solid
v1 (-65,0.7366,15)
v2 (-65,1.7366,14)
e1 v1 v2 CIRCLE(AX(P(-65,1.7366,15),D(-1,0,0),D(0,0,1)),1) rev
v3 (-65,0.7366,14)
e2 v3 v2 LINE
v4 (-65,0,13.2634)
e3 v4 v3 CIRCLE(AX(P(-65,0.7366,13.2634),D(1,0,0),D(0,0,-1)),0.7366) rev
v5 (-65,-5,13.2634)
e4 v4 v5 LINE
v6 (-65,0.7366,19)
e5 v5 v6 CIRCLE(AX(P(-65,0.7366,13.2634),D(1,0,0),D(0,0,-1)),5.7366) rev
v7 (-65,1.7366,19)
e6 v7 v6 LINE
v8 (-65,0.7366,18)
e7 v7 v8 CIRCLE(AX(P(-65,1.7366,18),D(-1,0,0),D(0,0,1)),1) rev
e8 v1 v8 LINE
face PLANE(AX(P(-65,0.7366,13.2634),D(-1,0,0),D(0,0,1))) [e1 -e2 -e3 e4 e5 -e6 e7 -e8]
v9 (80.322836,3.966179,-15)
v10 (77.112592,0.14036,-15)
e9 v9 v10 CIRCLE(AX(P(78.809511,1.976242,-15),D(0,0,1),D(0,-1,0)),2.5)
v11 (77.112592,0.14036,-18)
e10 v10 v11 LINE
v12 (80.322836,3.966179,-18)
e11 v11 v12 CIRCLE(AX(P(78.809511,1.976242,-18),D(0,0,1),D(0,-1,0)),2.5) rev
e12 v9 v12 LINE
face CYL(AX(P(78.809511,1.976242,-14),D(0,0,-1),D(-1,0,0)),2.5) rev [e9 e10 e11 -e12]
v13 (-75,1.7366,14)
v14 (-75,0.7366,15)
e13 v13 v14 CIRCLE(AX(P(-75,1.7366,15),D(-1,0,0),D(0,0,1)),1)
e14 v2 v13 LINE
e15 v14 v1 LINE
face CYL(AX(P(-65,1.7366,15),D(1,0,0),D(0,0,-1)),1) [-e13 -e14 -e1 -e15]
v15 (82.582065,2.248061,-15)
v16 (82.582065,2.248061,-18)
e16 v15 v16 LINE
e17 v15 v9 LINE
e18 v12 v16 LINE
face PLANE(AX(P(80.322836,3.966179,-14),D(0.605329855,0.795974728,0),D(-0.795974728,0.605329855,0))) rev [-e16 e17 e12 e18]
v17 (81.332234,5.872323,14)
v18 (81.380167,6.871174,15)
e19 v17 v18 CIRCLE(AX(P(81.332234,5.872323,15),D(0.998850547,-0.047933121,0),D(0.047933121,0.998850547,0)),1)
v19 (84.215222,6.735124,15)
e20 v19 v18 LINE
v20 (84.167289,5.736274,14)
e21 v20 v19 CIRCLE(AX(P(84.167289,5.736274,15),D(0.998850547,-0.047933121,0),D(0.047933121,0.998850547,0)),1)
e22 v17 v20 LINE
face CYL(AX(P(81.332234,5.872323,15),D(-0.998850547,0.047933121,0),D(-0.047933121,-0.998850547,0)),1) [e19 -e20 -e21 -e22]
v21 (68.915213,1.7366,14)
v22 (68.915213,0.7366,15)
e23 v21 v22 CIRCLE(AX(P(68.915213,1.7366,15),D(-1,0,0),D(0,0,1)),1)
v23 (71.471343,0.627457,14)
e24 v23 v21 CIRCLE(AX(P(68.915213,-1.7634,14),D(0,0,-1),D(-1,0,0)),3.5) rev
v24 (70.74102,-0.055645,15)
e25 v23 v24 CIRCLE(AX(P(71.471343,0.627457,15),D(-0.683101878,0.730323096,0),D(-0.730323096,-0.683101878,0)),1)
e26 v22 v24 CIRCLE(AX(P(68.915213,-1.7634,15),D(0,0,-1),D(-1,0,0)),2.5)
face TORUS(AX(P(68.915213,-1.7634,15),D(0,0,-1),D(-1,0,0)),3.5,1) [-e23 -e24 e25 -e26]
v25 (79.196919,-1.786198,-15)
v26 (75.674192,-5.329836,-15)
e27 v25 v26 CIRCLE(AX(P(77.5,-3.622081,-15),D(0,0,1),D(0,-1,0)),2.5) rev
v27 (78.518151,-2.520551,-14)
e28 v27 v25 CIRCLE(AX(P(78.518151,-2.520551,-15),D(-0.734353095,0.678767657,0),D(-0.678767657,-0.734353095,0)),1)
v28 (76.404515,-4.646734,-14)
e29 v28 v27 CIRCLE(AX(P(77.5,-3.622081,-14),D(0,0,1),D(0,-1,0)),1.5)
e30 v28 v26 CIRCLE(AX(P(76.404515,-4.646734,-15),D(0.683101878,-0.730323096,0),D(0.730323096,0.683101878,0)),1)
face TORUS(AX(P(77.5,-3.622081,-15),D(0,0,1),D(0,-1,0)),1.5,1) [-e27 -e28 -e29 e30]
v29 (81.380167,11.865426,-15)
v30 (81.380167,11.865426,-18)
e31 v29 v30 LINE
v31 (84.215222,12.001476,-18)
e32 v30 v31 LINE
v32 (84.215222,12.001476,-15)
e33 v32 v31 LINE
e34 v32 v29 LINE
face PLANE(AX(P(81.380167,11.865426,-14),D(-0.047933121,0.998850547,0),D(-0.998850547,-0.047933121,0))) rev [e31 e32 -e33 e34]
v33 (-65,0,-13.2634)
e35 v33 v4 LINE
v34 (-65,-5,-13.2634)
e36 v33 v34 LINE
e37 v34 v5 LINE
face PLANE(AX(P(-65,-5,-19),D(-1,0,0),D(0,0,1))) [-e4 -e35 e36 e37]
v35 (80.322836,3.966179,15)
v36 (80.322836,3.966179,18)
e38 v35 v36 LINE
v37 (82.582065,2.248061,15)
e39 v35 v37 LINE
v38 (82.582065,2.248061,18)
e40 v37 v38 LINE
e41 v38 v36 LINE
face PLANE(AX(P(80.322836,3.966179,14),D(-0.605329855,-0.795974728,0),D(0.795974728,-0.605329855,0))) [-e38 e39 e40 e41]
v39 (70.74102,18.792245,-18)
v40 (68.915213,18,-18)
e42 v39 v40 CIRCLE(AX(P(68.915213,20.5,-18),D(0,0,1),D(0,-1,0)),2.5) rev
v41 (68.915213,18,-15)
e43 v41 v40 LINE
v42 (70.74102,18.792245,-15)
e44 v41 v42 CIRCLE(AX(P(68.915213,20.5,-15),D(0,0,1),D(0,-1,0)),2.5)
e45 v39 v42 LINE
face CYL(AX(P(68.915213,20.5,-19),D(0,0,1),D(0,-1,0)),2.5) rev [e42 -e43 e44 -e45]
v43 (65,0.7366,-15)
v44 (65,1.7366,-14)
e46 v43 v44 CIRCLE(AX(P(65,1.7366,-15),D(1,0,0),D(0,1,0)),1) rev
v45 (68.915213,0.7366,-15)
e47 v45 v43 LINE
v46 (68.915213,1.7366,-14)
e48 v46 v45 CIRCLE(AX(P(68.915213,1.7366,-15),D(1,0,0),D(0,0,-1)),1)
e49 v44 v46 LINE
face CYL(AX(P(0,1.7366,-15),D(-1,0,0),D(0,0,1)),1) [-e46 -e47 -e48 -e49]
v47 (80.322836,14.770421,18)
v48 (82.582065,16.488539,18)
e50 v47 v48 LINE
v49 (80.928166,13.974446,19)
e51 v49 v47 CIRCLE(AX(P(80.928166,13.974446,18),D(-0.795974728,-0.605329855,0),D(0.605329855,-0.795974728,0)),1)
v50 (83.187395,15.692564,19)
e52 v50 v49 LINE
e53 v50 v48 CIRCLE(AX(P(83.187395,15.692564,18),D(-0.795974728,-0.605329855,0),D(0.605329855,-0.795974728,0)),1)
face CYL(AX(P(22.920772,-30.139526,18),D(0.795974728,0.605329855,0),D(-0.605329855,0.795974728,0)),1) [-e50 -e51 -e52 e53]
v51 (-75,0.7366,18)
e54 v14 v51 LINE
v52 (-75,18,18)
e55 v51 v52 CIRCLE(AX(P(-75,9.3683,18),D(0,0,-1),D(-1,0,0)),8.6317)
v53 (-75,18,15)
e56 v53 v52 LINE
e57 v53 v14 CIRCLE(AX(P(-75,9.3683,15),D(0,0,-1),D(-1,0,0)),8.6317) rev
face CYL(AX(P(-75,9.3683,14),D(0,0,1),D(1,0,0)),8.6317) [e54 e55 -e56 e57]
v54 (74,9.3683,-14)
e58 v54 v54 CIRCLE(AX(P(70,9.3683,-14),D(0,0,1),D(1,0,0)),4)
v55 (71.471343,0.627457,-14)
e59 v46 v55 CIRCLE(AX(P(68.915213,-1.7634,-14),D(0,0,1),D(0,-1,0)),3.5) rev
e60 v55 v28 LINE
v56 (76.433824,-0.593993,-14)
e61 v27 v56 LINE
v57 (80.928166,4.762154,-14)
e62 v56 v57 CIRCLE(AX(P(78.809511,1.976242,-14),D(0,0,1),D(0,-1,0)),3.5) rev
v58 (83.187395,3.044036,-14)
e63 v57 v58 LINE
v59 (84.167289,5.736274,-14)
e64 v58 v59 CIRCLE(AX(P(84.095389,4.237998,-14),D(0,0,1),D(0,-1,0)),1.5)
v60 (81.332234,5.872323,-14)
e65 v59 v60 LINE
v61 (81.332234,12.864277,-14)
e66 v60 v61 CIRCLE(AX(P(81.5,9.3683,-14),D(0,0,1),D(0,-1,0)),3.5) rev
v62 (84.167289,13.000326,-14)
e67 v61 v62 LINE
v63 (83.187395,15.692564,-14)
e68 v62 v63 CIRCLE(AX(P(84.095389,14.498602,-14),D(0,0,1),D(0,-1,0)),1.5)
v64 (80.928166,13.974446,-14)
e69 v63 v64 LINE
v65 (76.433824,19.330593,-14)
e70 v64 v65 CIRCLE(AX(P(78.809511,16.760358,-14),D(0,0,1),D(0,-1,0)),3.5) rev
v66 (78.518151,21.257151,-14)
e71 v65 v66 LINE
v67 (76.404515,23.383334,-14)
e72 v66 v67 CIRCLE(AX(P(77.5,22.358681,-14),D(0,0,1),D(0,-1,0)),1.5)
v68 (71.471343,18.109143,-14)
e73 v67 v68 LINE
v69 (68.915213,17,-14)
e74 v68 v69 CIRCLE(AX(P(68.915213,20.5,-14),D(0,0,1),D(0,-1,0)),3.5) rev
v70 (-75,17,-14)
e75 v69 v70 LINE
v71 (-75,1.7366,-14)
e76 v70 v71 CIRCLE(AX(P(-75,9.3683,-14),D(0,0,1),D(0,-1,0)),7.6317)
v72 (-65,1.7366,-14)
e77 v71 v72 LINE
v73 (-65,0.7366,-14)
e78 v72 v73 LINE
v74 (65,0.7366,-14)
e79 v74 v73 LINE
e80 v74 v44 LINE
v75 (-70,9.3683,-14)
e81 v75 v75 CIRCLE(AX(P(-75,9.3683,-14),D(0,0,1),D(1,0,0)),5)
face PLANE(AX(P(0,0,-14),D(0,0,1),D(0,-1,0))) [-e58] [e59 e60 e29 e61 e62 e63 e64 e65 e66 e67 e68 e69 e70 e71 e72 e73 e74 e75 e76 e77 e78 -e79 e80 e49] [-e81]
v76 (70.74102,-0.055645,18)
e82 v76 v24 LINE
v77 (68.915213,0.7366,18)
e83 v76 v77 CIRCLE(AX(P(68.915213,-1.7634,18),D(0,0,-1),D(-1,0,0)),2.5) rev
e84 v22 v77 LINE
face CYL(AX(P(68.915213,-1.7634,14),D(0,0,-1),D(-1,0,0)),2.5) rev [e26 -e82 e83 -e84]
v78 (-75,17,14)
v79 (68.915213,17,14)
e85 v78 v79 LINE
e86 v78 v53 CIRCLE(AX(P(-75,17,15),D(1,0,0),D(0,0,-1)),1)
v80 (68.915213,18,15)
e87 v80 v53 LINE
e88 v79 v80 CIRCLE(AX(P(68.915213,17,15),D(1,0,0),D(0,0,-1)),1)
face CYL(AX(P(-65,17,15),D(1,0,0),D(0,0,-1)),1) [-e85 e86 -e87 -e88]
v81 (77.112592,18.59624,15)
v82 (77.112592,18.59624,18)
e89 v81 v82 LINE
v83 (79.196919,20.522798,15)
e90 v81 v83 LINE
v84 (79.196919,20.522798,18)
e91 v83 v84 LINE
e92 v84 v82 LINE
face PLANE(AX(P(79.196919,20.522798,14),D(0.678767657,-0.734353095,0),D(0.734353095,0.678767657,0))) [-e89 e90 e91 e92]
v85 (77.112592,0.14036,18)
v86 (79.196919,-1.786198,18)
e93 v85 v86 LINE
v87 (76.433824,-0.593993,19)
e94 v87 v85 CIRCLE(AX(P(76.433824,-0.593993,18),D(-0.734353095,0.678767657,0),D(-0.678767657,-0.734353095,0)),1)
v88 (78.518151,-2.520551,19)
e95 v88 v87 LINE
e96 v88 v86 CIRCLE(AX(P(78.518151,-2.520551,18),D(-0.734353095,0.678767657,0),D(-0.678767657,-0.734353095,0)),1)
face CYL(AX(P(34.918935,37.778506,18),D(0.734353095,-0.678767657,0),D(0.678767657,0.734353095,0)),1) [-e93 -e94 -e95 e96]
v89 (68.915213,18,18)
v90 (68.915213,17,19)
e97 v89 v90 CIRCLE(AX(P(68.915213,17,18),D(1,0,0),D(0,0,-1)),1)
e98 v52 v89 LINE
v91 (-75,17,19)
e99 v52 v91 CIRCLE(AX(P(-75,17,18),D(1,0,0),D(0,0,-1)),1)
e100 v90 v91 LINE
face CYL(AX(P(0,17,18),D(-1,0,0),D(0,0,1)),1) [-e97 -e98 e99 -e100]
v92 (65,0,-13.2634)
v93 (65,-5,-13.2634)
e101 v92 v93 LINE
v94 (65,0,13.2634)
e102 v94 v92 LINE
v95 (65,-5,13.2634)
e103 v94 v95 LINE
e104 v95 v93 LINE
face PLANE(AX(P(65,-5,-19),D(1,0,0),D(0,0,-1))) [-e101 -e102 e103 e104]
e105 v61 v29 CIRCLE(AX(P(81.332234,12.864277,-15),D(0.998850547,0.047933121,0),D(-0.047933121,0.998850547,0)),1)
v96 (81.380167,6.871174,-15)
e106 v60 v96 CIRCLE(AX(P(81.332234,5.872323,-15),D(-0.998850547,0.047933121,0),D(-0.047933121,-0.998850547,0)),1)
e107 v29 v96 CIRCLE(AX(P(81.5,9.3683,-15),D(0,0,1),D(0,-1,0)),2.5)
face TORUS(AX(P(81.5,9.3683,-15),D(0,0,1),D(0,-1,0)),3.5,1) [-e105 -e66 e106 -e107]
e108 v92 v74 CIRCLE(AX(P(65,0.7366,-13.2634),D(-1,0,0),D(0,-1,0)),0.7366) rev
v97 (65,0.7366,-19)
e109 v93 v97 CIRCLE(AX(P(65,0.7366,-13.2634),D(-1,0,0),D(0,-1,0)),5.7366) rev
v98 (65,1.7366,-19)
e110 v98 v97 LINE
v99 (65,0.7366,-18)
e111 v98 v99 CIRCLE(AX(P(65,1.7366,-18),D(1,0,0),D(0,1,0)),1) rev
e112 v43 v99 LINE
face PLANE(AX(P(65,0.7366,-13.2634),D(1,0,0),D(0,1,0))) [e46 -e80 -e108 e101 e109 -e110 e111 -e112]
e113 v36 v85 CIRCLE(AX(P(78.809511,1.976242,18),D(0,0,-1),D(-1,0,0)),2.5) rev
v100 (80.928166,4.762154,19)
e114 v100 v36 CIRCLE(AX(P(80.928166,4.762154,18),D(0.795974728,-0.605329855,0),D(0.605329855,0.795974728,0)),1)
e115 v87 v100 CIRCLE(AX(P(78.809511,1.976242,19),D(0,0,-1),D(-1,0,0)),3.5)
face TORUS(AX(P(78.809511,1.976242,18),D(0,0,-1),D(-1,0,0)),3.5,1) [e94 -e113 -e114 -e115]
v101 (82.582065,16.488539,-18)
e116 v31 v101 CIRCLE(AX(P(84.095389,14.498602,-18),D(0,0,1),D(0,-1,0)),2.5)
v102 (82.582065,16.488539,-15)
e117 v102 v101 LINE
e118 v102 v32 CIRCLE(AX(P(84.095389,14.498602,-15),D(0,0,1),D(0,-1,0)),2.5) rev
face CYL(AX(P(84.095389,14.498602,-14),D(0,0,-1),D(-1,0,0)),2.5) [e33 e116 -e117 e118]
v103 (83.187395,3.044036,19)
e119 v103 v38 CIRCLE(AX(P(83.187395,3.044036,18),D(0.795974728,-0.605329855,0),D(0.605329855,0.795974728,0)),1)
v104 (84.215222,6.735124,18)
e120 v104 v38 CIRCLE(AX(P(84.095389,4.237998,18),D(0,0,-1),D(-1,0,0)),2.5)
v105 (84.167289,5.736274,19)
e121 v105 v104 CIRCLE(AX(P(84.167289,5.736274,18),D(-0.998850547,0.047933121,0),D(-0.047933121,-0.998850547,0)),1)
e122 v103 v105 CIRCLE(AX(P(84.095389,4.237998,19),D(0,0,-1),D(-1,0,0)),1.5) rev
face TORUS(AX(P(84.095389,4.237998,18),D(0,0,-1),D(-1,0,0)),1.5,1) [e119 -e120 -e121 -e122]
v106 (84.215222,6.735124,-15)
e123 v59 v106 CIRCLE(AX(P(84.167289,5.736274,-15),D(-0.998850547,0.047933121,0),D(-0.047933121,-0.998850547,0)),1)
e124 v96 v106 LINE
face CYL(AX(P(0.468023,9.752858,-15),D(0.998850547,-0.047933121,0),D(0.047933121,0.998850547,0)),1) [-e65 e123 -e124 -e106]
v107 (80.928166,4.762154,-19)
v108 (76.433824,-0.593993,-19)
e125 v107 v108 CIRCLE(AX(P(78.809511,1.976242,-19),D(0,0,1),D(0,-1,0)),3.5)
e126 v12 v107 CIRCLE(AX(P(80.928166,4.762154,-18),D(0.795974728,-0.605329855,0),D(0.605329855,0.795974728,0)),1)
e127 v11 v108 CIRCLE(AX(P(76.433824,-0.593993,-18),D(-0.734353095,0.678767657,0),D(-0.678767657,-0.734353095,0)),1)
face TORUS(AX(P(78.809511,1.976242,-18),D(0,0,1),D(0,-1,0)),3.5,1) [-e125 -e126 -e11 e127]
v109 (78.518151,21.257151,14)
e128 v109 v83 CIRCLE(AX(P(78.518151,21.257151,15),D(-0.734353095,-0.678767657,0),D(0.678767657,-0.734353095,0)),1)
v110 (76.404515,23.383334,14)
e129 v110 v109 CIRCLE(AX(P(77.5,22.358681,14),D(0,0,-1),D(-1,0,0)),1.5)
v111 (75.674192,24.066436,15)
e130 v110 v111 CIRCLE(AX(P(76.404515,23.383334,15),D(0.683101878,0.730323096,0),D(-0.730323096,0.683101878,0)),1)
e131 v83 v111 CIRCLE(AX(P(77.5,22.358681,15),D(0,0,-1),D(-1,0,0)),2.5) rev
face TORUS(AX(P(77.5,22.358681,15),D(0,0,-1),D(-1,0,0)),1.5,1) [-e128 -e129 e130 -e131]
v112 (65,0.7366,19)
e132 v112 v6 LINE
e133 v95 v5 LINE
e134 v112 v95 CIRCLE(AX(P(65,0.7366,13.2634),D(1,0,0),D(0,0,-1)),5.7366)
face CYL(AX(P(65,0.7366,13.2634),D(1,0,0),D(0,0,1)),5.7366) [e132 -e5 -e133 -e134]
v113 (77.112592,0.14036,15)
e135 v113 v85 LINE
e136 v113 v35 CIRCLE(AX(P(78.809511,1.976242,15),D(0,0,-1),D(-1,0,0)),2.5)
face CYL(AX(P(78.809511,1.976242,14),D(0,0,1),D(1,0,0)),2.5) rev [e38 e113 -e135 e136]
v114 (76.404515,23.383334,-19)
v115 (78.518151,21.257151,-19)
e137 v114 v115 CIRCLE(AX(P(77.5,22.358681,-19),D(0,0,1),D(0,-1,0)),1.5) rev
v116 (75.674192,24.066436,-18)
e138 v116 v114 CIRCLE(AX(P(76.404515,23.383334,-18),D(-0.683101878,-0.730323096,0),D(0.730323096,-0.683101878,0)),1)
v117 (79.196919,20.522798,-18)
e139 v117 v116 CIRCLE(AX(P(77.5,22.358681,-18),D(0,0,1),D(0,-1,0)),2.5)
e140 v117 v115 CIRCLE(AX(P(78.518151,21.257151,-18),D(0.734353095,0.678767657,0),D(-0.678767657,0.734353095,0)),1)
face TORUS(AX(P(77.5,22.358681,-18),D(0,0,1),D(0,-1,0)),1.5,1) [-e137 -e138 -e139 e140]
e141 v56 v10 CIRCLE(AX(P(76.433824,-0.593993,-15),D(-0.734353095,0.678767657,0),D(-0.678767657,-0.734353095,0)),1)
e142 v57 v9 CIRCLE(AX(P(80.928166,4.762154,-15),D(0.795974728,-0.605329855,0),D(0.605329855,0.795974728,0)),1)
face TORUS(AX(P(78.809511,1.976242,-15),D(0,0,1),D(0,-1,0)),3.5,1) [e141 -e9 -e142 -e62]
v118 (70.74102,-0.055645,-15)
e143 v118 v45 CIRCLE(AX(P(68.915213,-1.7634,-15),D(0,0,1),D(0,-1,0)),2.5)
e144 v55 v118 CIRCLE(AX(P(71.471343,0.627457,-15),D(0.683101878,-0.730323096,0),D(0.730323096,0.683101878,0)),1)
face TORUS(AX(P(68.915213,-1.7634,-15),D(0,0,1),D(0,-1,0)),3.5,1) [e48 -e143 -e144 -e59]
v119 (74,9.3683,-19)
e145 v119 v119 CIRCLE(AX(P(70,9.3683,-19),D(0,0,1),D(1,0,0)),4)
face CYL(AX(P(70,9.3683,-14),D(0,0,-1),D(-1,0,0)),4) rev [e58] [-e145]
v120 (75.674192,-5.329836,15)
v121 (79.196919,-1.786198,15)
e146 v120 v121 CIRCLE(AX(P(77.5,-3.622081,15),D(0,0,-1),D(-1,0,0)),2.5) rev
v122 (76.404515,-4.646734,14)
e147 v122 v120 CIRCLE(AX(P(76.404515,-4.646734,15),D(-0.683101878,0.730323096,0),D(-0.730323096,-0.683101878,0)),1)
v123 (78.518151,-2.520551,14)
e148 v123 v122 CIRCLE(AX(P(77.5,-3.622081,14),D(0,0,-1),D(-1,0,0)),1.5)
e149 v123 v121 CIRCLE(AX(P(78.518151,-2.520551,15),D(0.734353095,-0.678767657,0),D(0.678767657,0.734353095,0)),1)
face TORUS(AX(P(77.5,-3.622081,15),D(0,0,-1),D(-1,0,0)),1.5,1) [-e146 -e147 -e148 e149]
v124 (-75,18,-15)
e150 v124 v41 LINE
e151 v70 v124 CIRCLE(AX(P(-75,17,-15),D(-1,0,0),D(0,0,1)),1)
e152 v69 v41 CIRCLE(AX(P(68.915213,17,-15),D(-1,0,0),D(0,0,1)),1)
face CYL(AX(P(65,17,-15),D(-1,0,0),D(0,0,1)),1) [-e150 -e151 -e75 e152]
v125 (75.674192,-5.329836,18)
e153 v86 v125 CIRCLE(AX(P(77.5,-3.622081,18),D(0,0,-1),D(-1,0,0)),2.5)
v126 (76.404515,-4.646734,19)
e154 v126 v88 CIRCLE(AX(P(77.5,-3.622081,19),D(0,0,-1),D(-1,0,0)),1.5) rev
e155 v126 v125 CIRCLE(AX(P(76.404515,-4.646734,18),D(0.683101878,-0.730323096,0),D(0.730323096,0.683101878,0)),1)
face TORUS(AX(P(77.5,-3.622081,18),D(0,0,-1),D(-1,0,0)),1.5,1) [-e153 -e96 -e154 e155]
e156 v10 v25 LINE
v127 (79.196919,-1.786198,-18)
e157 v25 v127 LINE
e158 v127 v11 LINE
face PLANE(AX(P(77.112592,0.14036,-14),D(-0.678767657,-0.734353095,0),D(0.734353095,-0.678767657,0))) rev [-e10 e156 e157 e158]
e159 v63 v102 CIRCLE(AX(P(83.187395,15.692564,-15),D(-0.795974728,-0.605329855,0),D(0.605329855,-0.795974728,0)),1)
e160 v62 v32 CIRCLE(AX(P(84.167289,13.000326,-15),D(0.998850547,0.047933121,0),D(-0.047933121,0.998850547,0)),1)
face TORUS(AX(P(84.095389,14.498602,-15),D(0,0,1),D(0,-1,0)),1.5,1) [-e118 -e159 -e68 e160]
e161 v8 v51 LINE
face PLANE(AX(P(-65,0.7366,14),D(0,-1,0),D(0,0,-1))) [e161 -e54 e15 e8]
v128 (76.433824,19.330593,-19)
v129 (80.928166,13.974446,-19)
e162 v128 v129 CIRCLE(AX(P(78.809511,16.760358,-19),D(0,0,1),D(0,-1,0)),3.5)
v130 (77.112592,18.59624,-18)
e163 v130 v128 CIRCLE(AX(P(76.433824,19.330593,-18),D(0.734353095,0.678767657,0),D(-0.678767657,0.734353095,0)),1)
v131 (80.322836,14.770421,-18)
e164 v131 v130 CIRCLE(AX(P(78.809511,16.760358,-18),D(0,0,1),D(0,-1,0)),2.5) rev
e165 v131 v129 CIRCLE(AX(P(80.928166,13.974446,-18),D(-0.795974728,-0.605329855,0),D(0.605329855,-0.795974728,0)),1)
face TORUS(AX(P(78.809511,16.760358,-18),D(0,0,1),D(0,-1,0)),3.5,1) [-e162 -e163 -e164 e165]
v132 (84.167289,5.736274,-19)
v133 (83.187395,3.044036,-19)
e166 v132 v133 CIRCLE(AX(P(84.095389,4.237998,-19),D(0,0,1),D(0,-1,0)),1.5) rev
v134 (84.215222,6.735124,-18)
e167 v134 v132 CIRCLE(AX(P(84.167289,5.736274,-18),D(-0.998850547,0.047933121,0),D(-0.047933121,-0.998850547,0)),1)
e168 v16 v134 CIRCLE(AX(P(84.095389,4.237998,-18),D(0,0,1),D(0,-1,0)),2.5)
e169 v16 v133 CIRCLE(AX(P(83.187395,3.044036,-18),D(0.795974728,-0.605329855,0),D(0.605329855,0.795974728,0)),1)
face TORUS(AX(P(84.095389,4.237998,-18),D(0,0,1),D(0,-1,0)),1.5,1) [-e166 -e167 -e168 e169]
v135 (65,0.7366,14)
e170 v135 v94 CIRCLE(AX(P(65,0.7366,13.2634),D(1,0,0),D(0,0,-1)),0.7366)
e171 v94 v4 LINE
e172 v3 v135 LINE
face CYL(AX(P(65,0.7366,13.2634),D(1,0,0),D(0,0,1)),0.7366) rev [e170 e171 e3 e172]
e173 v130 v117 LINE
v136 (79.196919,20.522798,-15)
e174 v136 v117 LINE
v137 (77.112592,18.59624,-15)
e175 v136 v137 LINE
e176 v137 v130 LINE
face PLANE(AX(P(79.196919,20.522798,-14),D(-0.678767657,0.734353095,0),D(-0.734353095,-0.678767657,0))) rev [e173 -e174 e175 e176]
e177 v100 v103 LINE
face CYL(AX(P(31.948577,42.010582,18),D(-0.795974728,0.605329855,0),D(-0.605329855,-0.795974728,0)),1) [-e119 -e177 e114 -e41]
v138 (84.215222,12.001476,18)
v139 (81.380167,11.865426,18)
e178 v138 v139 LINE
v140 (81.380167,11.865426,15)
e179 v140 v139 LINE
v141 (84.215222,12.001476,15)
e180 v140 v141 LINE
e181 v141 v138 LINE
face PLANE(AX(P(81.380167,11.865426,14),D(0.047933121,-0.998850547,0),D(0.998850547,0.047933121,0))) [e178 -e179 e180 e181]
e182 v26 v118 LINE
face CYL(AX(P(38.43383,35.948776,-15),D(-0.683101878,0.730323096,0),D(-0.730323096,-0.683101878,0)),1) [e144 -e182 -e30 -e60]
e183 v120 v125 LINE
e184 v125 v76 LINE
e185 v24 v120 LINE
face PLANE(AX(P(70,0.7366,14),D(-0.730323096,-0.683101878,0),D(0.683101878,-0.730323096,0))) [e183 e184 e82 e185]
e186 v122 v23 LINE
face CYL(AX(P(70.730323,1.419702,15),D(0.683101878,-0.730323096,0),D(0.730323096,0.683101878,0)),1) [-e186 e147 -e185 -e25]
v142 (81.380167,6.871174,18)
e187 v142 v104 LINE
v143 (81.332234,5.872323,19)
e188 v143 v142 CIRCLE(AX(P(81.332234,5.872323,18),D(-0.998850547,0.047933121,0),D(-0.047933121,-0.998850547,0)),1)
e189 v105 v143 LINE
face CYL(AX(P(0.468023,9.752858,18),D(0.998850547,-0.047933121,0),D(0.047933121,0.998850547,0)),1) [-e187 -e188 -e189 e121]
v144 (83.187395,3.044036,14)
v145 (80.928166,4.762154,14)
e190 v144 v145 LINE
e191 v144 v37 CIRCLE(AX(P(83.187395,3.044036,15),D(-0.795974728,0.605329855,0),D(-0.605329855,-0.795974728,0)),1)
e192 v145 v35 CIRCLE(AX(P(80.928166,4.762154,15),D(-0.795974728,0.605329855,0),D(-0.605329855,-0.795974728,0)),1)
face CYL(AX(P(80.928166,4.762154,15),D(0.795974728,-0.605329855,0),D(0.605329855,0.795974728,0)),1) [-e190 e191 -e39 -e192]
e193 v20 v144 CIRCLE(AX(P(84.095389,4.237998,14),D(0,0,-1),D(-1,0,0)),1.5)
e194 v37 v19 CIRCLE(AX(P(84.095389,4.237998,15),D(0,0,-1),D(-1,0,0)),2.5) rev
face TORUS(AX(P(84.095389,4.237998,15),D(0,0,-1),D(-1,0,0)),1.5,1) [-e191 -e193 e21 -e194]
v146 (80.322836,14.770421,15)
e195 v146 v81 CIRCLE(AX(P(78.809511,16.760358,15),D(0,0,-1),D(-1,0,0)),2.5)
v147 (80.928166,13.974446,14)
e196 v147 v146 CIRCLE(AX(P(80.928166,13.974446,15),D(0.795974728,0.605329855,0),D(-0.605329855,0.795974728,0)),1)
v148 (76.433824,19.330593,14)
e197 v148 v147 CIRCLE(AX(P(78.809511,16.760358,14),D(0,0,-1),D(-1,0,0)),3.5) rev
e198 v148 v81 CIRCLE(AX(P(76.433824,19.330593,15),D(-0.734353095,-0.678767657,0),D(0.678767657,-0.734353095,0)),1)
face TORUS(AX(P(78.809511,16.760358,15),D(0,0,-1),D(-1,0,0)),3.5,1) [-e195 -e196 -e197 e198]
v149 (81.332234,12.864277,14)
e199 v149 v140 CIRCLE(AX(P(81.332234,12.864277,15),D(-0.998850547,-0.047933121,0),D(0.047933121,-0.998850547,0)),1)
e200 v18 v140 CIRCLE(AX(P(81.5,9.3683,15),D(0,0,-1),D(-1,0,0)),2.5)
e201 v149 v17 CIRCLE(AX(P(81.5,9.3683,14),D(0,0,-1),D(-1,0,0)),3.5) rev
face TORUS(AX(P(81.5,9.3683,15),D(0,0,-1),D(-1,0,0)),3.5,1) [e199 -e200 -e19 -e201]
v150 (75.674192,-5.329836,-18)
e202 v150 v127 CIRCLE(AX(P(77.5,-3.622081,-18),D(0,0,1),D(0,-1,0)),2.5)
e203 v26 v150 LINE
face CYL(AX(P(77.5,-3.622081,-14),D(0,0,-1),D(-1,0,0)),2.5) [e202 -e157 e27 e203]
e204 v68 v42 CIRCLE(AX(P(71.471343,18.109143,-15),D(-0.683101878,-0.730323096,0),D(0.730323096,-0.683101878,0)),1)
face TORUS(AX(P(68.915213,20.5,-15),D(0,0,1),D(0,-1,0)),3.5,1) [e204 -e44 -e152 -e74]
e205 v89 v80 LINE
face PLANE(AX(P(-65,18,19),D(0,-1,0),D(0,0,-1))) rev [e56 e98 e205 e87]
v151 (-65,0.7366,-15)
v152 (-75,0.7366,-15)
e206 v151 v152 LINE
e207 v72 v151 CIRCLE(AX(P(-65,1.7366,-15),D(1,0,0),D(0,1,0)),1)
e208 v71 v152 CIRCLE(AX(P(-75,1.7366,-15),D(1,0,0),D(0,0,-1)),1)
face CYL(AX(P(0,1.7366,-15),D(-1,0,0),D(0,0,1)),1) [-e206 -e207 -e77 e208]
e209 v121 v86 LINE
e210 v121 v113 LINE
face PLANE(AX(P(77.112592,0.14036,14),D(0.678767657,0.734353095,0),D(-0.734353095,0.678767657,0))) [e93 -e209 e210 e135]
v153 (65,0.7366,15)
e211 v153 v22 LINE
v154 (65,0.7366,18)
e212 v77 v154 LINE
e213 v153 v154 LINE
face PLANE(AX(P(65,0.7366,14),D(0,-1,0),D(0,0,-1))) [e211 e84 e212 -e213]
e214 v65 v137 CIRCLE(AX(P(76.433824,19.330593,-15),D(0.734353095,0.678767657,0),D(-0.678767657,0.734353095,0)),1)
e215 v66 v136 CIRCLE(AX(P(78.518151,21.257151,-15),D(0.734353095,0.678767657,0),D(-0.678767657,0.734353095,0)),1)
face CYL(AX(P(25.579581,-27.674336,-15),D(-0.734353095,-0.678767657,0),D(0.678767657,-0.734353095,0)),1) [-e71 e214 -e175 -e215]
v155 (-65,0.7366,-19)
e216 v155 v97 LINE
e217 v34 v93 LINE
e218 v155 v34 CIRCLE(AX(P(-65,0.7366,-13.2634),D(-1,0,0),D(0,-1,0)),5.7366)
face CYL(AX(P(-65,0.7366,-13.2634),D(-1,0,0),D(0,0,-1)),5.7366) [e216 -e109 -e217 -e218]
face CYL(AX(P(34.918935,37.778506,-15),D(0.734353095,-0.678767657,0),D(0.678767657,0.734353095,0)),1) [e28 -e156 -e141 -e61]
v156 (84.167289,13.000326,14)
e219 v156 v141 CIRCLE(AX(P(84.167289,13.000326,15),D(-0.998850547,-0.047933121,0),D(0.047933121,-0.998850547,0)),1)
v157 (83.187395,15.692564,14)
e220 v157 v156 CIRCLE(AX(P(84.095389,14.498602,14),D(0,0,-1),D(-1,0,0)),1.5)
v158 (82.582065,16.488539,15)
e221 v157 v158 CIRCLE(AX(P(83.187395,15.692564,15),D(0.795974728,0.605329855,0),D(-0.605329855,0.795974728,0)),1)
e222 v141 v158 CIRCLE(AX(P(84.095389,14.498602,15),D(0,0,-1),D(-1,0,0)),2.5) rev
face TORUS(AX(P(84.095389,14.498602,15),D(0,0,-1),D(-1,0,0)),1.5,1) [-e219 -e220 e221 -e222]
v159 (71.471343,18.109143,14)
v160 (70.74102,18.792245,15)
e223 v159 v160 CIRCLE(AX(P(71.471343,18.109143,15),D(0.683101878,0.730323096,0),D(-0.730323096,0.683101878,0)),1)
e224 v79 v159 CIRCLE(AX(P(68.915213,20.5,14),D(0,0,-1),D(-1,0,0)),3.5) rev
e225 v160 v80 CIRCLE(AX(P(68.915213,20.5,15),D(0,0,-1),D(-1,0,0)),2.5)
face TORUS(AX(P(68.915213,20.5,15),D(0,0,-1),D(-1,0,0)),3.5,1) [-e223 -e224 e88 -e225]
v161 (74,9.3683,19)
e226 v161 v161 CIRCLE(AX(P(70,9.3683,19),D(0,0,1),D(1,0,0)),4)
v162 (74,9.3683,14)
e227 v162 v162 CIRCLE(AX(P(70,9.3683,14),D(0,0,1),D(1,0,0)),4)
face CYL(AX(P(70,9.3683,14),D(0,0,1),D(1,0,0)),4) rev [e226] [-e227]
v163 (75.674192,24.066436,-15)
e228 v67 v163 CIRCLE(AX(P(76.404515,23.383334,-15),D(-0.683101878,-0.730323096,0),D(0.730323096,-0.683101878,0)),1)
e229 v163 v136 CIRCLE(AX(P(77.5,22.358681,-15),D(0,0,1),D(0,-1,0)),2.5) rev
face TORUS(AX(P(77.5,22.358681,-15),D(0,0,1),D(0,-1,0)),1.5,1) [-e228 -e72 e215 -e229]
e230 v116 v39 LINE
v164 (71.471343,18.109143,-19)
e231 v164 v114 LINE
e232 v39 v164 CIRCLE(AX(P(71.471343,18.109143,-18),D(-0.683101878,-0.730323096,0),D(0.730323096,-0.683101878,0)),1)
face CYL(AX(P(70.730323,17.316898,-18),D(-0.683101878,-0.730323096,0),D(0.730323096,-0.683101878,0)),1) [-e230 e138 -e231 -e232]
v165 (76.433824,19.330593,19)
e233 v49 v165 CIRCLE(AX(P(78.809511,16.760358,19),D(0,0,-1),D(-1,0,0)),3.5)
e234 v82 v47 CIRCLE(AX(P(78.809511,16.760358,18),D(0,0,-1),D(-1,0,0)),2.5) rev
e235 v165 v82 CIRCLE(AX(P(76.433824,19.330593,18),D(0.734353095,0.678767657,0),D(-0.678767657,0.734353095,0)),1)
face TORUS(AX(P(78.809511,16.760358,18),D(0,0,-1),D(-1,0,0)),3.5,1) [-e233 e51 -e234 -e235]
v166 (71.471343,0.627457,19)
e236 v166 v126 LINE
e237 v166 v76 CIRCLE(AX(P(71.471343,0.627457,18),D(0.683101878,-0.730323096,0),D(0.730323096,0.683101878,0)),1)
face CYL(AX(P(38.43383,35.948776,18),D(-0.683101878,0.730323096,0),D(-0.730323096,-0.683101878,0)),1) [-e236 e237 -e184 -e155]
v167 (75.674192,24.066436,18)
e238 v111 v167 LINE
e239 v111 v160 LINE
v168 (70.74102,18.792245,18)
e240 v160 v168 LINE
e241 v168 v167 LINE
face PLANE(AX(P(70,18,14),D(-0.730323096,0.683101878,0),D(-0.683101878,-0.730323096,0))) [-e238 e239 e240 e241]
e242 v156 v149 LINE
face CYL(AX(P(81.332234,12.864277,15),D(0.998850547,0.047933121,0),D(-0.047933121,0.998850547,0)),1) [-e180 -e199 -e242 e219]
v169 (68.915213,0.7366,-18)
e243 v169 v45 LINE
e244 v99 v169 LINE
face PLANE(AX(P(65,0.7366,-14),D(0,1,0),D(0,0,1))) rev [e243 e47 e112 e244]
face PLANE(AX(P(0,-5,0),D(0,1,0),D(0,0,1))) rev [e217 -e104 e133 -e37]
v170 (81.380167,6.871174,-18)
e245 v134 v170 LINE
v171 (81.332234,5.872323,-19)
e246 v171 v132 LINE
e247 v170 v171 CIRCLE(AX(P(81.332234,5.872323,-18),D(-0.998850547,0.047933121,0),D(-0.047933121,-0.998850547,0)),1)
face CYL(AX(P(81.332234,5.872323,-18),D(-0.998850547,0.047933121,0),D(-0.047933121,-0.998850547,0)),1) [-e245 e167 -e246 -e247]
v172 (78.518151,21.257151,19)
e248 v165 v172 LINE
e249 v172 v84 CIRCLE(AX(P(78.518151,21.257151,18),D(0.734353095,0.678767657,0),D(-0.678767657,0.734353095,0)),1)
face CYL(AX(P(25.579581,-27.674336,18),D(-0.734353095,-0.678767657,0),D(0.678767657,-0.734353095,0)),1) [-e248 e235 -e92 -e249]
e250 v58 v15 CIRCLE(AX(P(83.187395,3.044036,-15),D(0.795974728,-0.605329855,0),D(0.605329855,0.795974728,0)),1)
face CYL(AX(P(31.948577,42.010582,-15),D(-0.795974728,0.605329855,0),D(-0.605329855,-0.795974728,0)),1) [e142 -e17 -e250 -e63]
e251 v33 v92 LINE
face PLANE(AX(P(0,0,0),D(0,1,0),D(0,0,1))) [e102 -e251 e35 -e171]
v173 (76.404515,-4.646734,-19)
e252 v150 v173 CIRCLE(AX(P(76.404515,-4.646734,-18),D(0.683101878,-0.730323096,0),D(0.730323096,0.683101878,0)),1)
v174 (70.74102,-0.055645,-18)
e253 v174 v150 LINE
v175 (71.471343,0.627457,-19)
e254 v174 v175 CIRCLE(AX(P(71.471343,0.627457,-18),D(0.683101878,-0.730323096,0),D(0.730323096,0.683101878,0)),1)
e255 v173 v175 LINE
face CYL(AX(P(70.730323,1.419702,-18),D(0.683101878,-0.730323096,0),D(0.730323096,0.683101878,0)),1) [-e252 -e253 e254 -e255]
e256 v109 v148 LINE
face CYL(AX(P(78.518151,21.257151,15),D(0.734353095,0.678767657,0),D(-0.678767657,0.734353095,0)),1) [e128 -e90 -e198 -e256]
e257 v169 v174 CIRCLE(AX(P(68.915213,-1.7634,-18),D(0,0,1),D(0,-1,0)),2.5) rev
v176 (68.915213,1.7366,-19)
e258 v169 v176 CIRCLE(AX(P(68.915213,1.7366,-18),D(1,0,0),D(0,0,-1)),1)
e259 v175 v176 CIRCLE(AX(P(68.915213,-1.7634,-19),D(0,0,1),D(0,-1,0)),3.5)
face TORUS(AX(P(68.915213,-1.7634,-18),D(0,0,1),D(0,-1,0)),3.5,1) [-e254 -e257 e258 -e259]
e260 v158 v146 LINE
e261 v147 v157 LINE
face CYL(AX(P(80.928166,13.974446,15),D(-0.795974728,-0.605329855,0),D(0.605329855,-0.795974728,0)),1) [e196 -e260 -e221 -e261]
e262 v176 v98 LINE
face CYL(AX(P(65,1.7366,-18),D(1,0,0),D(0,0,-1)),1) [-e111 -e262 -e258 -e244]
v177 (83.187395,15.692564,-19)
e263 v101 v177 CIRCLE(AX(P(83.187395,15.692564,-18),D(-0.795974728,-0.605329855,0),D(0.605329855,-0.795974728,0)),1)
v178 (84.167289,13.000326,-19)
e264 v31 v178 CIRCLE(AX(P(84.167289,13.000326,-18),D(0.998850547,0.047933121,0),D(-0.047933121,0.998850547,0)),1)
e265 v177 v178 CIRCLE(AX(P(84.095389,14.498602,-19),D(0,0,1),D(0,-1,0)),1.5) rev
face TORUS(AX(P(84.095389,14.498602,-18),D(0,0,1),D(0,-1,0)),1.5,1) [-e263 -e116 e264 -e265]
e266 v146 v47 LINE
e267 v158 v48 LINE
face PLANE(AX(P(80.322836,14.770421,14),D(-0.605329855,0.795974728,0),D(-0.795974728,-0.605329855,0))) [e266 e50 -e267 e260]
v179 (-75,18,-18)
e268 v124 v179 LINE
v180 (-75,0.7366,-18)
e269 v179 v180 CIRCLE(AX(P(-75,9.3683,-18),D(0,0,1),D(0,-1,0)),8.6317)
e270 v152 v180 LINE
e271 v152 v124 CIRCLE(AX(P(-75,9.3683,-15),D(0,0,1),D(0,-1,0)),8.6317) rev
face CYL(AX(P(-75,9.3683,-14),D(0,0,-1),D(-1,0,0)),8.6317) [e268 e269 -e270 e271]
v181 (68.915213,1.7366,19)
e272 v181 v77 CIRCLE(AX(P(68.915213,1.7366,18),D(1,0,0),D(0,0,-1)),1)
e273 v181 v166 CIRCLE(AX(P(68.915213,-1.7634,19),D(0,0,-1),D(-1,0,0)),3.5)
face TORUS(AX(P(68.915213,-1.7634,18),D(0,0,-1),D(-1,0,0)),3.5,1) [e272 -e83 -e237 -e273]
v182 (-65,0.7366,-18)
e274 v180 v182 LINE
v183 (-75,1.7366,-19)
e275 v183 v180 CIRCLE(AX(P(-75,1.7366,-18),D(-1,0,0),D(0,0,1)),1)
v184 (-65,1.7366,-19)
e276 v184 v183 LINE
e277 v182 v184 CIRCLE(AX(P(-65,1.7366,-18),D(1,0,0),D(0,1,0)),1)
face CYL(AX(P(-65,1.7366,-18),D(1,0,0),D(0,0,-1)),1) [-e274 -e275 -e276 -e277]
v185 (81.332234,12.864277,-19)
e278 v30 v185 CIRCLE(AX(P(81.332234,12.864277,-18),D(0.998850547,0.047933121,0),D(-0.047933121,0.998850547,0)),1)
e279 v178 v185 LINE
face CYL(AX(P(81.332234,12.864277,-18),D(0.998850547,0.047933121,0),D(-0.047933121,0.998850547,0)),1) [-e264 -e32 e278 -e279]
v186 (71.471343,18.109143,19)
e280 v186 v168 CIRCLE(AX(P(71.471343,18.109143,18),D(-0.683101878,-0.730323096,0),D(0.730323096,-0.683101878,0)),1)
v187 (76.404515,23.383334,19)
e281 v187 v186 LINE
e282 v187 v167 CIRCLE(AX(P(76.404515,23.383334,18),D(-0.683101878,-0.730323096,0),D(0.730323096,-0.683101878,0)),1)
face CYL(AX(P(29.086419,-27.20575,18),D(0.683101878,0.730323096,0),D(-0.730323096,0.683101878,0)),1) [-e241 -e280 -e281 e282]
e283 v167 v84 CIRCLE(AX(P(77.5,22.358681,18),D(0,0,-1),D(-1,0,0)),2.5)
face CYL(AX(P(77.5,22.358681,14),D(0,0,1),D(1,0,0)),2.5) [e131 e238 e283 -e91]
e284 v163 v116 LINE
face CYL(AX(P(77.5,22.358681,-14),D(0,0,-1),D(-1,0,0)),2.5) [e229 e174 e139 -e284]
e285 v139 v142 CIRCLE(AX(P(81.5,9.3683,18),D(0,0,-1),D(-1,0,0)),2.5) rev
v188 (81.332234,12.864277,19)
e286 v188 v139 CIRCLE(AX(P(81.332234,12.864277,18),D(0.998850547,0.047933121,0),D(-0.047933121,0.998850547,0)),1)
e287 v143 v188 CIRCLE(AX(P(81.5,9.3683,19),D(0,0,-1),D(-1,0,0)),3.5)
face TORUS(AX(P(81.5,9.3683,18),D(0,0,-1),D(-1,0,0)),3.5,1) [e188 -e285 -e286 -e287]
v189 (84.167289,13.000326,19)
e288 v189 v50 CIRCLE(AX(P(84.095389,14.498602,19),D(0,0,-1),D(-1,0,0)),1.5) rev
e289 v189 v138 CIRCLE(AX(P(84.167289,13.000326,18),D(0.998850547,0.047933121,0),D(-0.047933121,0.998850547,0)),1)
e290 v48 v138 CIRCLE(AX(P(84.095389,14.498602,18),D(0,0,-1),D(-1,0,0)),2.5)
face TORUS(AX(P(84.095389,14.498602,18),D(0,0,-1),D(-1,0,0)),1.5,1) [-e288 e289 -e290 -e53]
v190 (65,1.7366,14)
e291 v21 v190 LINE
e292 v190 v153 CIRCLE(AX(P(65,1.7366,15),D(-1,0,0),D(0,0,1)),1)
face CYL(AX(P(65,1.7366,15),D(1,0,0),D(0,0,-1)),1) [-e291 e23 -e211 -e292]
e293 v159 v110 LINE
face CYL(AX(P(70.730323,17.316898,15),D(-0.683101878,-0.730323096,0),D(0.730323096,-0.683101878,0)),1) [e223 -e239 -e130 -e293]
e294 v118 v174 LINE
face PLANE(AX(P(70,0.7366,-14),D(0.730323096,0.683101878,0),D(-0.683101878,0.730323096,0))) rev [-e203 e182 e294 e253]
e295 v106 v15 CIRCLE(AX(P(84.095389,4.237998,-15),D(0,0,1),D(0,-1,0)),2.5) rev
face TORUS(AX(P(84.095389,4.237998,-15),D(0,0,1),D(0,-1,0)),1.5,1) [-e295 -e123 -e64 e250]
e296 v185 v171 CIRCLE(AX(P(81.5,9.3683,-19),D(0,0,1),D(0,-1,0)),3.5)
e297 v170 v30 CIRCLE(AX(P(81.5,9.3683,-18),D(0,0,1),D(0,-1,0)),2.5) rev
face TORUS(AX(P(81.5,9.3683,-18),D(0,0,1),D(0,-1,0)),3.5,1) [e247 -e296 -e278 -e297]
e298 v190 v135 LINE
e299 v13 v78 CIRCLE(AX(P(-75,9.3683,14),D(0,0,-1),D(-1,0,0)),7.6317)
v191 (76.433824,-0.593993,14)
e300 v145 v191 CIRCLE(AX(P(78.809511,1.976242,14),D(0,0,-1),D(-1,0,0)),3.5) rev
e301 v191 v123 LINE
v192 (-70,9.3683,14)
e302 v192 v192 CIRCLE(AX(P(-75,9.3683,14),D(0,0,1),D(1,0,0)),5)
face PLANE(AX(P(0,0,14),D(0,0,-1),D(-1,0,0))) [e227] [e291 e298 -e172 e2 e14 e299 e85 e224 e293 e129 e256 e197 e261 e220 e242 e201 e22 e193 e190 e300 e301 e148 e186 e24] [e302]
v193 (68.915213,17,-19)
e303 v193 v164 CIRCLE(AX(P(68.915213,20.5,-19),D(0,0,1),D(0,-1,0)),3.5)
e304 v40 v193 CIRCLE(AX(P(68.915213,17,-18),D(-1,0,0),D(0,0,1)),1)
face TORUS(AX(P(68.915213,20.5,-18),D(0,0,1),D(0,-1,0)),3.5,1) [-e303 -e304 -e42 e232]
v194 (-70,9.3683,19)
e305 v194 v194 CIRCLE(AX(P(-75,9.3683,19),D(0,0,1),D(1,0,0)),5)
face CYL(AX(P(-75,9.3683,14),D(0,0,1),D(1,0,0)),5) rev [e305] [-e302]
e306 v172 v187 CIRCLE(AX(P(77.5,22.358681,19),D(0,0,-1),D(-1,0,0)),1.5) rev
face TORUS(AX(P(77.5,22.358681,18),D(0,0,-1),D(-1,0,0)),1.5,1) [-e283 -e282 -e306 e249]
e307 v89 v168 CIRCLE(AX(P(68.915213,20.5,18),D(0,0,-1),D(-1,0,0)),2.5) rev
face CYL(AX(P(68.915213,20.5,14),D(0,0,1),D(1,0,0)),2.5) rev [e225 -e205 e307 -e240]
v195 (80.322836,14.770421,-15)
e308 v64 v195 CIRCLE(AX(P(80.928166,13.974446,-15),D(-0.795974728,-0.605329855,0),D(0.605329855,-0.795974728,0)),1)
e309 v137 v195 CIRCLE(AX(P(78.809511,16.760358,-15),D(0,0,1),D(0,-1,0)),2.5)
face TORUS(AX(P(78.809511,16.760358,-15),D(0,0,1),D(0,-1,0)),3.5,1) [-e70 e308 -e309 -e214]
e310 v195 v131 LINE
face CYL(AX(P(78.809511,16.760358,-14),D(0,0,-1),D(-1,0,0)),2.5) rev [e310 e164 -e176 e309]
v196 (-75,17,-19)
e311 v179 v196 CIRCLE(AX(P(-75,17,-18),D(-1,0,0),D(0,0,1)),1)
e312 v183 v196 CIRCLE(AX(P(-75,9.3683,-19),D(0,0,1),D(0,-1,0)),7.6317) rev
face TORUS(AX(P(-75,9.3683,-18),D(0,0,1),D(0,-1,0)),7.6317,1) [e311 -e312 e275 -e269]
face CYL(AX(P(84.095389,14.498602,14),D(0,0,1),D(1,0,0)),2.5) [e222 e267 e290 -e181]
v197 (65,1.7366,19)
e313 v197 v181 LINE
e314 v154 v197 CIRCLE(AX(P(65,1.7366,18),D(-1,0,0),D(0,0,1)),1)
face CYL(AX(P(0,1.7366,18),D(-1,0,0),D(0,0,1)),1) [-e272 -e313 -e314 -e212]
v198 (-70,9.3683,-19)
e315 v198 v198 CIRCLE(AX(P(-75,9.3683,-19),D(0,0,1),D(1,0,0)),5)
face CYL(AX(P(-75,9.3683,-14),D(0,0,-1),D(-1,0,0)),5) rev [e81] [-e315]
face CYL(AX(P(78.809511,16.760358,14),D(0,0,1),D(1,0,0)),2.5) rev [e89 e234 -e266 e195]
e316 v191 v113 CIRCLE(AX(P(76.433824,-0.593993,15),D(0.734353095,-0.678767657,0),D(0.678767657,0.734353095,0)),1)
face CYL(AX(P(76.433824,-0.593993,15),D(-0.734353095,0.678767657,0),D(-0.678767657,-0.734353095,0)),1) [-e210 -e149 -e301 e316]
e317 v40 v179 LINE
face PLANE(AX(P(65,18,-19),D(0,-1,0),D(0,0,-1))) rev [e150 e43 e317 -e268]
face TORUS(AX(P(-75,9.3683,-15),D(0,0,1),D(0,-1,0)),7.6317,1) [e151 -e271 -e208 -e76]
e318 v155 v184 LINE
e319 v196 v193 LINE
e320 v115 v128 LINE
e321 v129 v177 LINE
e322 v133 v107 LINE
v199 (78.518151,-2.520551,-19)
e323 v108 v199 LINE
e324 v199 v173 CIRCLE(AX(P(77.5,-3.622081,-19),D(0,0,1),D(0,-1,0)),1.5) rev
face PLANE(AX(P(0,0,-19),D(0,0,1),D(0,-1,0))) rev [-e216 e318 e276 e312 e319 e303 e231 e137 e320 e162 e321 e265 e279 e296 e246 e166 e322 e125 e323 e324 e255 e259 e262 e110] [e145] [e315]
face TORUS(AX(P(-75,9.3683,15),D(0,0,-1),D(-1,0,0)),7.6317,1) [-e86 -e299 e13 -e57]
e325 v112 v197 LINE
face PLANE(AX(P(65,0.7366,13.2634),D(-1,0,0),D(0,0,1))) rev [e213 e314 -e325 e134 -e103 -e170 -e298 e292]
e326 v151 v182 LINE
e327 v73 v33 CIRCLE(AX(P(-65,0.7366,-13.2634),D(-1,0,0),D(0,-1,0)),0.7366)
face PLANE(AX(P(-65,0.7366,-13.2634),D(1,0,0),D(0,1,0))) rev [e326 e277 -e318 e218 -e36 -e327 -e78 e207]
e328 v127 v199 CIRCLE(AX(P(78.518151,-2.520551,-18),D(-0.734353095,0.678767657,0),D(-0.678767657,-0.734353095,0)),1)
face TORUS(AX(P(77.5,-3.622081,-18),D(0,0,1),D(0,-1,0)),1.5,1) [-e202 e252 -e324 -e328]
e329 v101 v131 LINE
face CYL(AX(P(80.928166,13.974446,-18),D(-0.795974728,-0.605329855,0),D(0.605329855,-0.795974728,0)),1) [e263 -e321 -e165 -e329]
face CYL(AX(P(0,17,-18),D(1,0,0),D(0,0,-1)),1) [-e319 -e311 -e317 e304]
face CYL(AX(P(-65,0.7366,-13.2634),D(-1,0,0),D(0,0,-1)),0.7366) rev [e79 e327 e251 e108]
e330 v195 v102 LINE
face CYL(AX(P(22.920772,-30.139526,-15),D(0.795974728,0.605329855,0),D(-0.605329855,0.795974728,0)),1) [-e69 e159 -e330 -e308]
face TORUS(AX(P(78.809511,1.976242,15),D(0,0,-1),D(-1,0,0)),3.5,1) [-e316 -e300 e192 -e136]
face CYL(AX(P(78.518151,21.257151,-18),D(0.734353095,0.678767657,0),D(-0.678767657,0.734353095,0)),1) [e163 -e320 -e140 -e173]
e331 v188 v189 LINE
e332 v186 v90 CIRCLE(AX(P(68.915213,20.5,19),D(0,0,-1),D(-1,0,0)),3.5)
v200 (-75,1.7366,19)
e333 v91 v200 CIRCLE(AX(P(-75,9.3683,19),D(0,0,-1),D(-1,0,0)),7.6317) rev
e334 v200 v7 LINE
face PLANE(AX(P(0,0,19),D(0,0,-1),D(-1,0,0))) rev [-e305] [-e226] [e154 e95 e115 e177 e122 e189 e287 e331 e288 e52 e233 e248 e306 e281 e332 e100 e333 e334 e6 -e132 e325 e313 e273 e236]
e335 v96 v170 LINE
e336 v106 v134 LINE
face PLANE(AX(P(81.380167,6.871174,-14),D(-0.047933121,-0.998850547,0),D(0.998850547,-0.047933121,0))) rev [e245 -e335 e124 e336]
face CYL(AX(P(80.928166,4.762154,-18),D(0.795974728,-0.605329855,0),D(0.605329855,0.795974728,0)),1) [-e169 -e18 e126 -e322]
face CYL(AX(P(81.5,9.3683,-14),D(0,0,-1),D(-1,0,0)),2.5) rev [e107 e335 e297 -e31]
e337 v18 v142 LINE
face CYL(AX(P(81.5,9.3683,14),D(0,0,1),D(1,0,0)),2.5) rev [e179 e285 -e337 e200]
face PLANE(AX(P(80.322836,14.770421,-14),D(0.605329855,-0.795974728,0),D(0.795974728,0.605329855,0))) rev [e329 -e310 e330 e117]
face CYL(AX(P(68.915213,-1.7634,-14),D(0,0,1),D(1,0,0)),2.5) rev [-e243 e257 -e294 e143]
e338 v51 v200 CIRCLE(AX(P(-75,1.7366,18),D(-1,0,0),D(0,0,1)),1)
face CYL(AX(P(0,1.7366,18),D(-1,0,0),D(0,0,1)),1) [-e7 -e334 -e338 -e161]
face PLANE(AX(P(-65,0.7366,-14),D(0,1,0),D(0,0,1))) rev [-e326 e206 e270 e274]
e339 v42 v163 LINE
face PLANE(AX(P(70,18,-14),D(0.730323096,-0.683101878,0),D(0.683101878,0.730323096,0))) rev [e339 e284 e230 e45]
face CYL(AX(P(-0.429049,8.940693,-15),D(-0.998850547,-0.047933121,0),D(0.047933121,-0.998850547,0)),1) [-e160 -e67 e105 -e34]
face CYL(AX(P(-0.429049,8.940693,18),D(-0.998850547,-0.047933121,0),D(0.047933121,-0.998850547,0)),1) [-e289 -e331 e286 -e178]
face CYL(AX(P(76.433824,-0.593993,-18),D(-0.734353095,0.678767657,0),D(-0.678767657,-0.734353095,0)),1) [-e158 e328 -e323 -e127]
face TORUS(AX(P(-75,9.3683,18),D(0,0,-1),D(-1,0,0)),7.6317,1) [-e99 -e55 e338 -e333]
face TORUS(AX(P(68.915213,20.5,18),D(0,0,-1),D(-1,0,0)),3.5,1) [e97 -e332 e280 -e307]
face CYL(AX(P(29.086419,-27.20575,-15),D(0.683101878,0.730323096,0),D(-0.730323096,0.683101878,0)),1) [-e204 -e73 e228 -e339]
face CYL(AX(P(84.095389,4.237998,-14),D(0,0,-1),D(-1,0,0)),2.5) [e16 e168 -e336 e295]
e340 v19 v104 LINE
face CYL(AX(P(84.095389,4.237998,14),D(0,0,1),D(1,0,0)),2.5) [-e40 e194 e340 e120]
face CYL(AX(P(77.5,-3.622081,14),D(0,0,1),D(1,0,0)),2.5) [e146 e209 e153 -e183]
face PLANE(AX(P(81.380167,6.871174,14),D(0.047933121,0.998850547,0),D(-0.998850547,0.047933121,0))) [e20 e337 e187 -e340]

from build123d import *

# Parameters (mm, degrees)
SKETCH1_W                      = 130
SKETCH1_H                      = 38
BASE_FLANGE1_DEPTH             = 5
EDGE_FLANGE1_STRIP_W           = 21.4732
EDGE_FLANGE1_STRIP_H           = 5
EDGE_FLANGE1_STRIP_CUT_DEPTH   = 130
EDGE_FLANGE1_STRIP_2_W         = 21.4732
EDGE_FLANGE1_STRIP_2_H         = 5
EDGE_FLANGE1_STRIP_CUT_2_DEPTH = 130
EDGE_FLANGE1_DEPTH             = 130
EDGE_FLANGE1_BEND_DEPTH        = 130
SKETCH15_R                     = 5
BOSS_EXTRUDE1_DEPTH            = 5
BOSS_EXTRUDE2_DEPTH            = 5
SKETCH17_R                     = 4
CUT_EXTRUDE2_DEPTH             = 5
FILLET3_R                      = 2.5
FILLET4_R                      = 1


# Sheet-metal steps are written as plain solids
with BuildPart() as part:
    # Sketch1 → Base-Flange1 (new body)
    with BuildSketch(Plane(origin=(0, 0, 0), x_dir=(1, 0, 0), z_dir=(0, 1, 0))):
        Rectangle(SKETCH1_W, SKETCH1_H)
    extrude(amount=-BASE_FLANGE1_DEPTH)

    # Edge-Flange1 strip (across the edge) → Edge-Flange1 strip cut (cut)
    with BuildSketch(Plane(origin=(-65, 0, 19), x_dir=(0, 0, -1), z_dir=(1, 0, 0))):
        with Locations((-5, -2.5)):
            Rectangle(EDGE_FLANGE1_STRIP_W, EDGE_FLANGE1_STRIP_H)
    extrude(amount=EDGE_FLANGE1_STRIP_CUT_DEPTH, mode=Mode.SUBTRACT)

    # Edge-Flange1 strip 2 (across the edge) → Edge-Flange1 strip cut 2 (cut)
    with BuildSketch(Plane(origin=(65, 0, -19), x_dir=(0, 0, 1), z_dir=(-1, 0, 0))):
        with Locations((-5, -2.5)):
            Rectangle(EDGE_FLANGE1_STRIP_2_W, EDGE_FLANGE1_STRIP_2_H)
    extrude(amount=EDGE_FLANGE1_STRIP_CUT_2_DEPTH, mode=Mode.SUBTRACT)

    # Edge-Flange1 section (across the edge) → Edge-Flange1 (add)
    with BuildSketch(Plane(origin=(-65, 0, 19), x_dir=(0, 0, -1), z_dir=(1, 0, 0))):
        with BuildLine():
            Line((0, 0.7366), (0, 18))
            Line((0, 18), (5, 18))
            Line((5, 18), (5, 0.7366))
            ThreePointArc((5, 0.7366), (5.215745145, 0.215745145), (5.7366, 0))
            Line((5.7366, 0), (5.7366, -5))
            ThreePointArc((5.7366, -5), (1.680211239, -3.319788761), (0, 0.7366))
        make_face()
    extrude(amount=EDGE_FLANGE1_DEPTH)

    # Edge-Flange1 section 2 (across the edge) → Edge-Flange1 bend (add)
    with BuildSketch(Plane(origin=(65, 0, -19), x_dir=(0, 0, 1), z_dir=(-1, 0, 0))):
        with BuildLine():
            Line((0, 0.7366), (0, 18))
            Line((0, 18), (5, 18))
            Line((5, 18), (5, 0.7366))
            ThreePointArc((5, 0.7366), (5.215745145, 0.215745145), (5.7366, 0))
            Line((5.7366, 0), (5.7366, -5))
            ThreePointArc((5.7366, -5), (1.680211239, -3.319788761), (0, 0.7366))
        make_face()
    extrude(amount=EDGE_FLANGE1_BEND_DEPTH)

    # Sketch15 → Boss-Extrude1 (add)
    with BuildSketch(Plane.XY.offset(19)):
        with BuildLine():
            Line((-75, 18), (-65, 18))
            Line((-65, 18), (-65, 0.7366))
            Line((-65, 0.7366), (-75, 0.7366))
            ThreePointArc((-75, 0.7366), (-83.6317, 9.3683), (-75, 18))
        make_face()
        with Locations((-75, 9.3683)):
            Circle(SKETCH15_R, mode=Mode.SUBTRACT)
    boss_extrude1 = extrude(amount=-BOSS_EXTRUDE1_DEPTH)

    # Mirror3: Boss-Extrude1 across plane
    add(boss_extrude1.mirror(Plane.XY))

    # Sketch16 → Boss-Extrude2 (add)
    with BuildSketch(Plane.XY.offset(19)):
        with BuildLine():
            Line((65, 18), (70, 18))
            Line((70, 18), (75.674192261, 24.066435752))
            ThreePointArc((75.674192261, 24.066435752), (79.272990308, 24.121209175), (79.196919142, 20.52279832))
            Line((79.196919142, 20.52279832), (77.112591954, 18.596240249))
            ThreePointArc((77.112591954, 18.596240249), (76.894399988, 15.153388487), (80.322835732, 14.770420692))
            Line((80.322835732, 14.770420692), (82.582064675, 16.488538969))
            ThreePointArc((82.582064675, 16.488538969), (86.444620864, 15.353652508), (84.215222115, 12.001475782))
            Line((84.215222115, 12.001475782), (81.380167197, 11.865426368))
            ThreePointArc((81.380167197, 11.865426368), (79, 9.3683), (81.380167197, 6.871173632))
            Line((81.380167197, 6.871173632), (84.215222115, 6.735124218))
            ThreePointArc((84.215222115, 6.735124218), (86.444620864, 3.382947492), (82.582064675, 2.248061031))
            Line((82.582064675, 2.248061031), (80.322835732, 3.966179308))
            ThreePointArc((80.322835732, 3.966179308), (76.894399988, 3.583211513), (77.112591954, 0.140359751))
            Line((77.112591954, 0.140359751), (79.196919142, -1.78619832))
            ThreePointArc((79.196919142, -1.78619832), (79.272990308, -5.384609175), (75.674192261, -5.329835752))
            Line((75.674192261, -5.329835752), (70, 0.7366))
            Line((70, 0.7366), (65, 0.7366))
            Line((65, 0.7366), (65, 18))
        make_face()
    boss_extrude2 = extrude(amount=-BOSS_EXTRUDE2_DEPTH)

    # Sketch17 → Cut-Extrude2 (cut)
    with BuildSketch(Plane.XY.offset(19)):
        with Locations((70, 9.3683)):
            Circle(SKETCH17_R)
    cut_extrude2 = extrude(amount=-CUT_EXTRUDE2_DEPTH, mode=Mode.SUBTRACT)

    # Mirror5: Boss-Extrude2, Cut-Extrude2 across plane
    add(boss_extrude2.mirror(Plane.XY))
    add(cut_extrude2.mirror(Plane.XY), mode=Mode.SUBTRACT)

    # Fillet3
    fillet3_edges = [part.edges().sort_by_distance(p)[0] for p in [
        (70, 0.7366, 16.5),
        (70, 18, 16.5),
        (70, 0.7366, -16.5),
        (70, 18, -16.5),
    ]]
    fillet(fillet3_edges, radius=FILLET3_R)

    # Fillet4
    fillet4_edges = [part.edges().sort_by_distance(p)[0] for p in [
        (66.957606292, 0.7366, 14),
        (73.207606292, 21.429340528, 14),
        (79.272990308, 24.121209175, 14),
        (78.154755548, 19.559519284, 14),
        (76.894399988, 15.153388487, 14),
        (81.452450204, 15.629479831, 14),
        (86.444620864, 15.353652508, 14),
        (82.797694656, 11.933451075, 14),
        (79, 9.3683, 14),
        (82.797694656, 6.803148925, 14),
        (86.444620864, 3.382947492, 14),
        (81.452450204, 3.107120169, 14),
        (76.894399988, 3.583211513, 14),
        (78.154755548, -0.822919284, 14),
        (79.272990308, -5.384609175, 14),
        (79.272990308, -5.384609175, 19),
        (78.154755548, -0.822919284, 19),
        (76.894399988, 3.583211513, 19),
        (81.452450204, 3.107120169, 19),
        (86.444620864, 3.382947492, 19),
        (82.797694656, 6.803148925, 19),
        (79, 9.3683, 19),
        (82.797694656, 11.933451075, 19),
        (86.444620864, 15.353652508, 19),
        (81.452450204, 15.629479831, 19),
        (76.894399988, 15.153388487, 19),
        (78.154755548, 19.559519284, 19),
        (79.272990308, 24.121209175, 19),
        (73.207606292, 21.429340528, 19),
        (66.957606292, 0.7366, 19),
        (79.272990308, -5.384609175, -19),
        (78.154755548, -0.822919284, -19),
        (76.894399988, 3.583211513, -19),
        (81.452450204, 3.107120169, -19),
        (86.444620864, 3.382947492, -19),
        (82.797694656, 6.803148925, -19),
        (79, 9.3683, -19),
        (82.797694656, 11.933451075, -19),
        (86.444620864, 15.353652508, -19),
        (81.452450204, 15.629479831, -19),
        (76.894399988, 15.153388487, -19),
        (78.154755548, 19.559519284, -19),
        (79.272990308, 24.121209175, -19),
        (73.207606292, 21.429340528, -19),
        (66.957606292, 0.7366, -19),
        (79.272990308, -5.384609175, -14),
        (78.154755548, -0.822919284, -14),
        (76.894399988, 3.583211513, -14),
        (81.452450204, 3.107120169, -14),
        (86.444620864, 3.382947492, -14),
        (82.797694656, 6.803148925, -14),
        (79, 9.3683, -14),
        (82.797694656, 11.933451075, -14),
        (86.444620864, 15.353652508, -14),
        (81.452450204, 15.629479831, -14),
        (76.894399988, 15.153388487, -14),
        (78.154755548, 19.559519284, -14),
        (79.272990308, 24.121209175, -14),
        (73.207606292, 21.429340528, -14),
        (66.957606292, 0.7366, -14),
        (-3.042393708, 18, 14),
        (-3.042393708, 18, 19),
        (73.207606292, -2.692740528, 19),
        (73.207606292, -2.692740528, 14),
        (73.207606292, -2.692740528, -19),
        (73.207606292, -2.692740528, -14),
        (69.910354096, 18.206597861, 19),
        (69.910354096, 18.206597861, 14),
        (69.910354096, 0.530002139, 19),
        (69.910354096, 0.530002139, 14),
        (69.910354096, 0.530002139, -19),
        (69.910354096, 0.530002139, -14),
        (69.910354096, 18.206597861, -19),
        (69.910354096, 18.206597861, -14),
        (-3.042393708, 18, -19),
        (-3.042393708, 18, -14),
        (-70, 0.7366, 14),
        (-83.6317, 9.3683, 14),
        (-70, 0.7366, 19),
        (-83.6317, 9.3683, 19),
        (-70, 0.7366, -14),
        (-83.6317, 9.3683, -14),
        (-70, 0.7366, -19),
        (-83.6317, 9.3683, -19),
    ]]
    fillet(fillet4_edges, radius=FILLET4_R)


solid = part.part
